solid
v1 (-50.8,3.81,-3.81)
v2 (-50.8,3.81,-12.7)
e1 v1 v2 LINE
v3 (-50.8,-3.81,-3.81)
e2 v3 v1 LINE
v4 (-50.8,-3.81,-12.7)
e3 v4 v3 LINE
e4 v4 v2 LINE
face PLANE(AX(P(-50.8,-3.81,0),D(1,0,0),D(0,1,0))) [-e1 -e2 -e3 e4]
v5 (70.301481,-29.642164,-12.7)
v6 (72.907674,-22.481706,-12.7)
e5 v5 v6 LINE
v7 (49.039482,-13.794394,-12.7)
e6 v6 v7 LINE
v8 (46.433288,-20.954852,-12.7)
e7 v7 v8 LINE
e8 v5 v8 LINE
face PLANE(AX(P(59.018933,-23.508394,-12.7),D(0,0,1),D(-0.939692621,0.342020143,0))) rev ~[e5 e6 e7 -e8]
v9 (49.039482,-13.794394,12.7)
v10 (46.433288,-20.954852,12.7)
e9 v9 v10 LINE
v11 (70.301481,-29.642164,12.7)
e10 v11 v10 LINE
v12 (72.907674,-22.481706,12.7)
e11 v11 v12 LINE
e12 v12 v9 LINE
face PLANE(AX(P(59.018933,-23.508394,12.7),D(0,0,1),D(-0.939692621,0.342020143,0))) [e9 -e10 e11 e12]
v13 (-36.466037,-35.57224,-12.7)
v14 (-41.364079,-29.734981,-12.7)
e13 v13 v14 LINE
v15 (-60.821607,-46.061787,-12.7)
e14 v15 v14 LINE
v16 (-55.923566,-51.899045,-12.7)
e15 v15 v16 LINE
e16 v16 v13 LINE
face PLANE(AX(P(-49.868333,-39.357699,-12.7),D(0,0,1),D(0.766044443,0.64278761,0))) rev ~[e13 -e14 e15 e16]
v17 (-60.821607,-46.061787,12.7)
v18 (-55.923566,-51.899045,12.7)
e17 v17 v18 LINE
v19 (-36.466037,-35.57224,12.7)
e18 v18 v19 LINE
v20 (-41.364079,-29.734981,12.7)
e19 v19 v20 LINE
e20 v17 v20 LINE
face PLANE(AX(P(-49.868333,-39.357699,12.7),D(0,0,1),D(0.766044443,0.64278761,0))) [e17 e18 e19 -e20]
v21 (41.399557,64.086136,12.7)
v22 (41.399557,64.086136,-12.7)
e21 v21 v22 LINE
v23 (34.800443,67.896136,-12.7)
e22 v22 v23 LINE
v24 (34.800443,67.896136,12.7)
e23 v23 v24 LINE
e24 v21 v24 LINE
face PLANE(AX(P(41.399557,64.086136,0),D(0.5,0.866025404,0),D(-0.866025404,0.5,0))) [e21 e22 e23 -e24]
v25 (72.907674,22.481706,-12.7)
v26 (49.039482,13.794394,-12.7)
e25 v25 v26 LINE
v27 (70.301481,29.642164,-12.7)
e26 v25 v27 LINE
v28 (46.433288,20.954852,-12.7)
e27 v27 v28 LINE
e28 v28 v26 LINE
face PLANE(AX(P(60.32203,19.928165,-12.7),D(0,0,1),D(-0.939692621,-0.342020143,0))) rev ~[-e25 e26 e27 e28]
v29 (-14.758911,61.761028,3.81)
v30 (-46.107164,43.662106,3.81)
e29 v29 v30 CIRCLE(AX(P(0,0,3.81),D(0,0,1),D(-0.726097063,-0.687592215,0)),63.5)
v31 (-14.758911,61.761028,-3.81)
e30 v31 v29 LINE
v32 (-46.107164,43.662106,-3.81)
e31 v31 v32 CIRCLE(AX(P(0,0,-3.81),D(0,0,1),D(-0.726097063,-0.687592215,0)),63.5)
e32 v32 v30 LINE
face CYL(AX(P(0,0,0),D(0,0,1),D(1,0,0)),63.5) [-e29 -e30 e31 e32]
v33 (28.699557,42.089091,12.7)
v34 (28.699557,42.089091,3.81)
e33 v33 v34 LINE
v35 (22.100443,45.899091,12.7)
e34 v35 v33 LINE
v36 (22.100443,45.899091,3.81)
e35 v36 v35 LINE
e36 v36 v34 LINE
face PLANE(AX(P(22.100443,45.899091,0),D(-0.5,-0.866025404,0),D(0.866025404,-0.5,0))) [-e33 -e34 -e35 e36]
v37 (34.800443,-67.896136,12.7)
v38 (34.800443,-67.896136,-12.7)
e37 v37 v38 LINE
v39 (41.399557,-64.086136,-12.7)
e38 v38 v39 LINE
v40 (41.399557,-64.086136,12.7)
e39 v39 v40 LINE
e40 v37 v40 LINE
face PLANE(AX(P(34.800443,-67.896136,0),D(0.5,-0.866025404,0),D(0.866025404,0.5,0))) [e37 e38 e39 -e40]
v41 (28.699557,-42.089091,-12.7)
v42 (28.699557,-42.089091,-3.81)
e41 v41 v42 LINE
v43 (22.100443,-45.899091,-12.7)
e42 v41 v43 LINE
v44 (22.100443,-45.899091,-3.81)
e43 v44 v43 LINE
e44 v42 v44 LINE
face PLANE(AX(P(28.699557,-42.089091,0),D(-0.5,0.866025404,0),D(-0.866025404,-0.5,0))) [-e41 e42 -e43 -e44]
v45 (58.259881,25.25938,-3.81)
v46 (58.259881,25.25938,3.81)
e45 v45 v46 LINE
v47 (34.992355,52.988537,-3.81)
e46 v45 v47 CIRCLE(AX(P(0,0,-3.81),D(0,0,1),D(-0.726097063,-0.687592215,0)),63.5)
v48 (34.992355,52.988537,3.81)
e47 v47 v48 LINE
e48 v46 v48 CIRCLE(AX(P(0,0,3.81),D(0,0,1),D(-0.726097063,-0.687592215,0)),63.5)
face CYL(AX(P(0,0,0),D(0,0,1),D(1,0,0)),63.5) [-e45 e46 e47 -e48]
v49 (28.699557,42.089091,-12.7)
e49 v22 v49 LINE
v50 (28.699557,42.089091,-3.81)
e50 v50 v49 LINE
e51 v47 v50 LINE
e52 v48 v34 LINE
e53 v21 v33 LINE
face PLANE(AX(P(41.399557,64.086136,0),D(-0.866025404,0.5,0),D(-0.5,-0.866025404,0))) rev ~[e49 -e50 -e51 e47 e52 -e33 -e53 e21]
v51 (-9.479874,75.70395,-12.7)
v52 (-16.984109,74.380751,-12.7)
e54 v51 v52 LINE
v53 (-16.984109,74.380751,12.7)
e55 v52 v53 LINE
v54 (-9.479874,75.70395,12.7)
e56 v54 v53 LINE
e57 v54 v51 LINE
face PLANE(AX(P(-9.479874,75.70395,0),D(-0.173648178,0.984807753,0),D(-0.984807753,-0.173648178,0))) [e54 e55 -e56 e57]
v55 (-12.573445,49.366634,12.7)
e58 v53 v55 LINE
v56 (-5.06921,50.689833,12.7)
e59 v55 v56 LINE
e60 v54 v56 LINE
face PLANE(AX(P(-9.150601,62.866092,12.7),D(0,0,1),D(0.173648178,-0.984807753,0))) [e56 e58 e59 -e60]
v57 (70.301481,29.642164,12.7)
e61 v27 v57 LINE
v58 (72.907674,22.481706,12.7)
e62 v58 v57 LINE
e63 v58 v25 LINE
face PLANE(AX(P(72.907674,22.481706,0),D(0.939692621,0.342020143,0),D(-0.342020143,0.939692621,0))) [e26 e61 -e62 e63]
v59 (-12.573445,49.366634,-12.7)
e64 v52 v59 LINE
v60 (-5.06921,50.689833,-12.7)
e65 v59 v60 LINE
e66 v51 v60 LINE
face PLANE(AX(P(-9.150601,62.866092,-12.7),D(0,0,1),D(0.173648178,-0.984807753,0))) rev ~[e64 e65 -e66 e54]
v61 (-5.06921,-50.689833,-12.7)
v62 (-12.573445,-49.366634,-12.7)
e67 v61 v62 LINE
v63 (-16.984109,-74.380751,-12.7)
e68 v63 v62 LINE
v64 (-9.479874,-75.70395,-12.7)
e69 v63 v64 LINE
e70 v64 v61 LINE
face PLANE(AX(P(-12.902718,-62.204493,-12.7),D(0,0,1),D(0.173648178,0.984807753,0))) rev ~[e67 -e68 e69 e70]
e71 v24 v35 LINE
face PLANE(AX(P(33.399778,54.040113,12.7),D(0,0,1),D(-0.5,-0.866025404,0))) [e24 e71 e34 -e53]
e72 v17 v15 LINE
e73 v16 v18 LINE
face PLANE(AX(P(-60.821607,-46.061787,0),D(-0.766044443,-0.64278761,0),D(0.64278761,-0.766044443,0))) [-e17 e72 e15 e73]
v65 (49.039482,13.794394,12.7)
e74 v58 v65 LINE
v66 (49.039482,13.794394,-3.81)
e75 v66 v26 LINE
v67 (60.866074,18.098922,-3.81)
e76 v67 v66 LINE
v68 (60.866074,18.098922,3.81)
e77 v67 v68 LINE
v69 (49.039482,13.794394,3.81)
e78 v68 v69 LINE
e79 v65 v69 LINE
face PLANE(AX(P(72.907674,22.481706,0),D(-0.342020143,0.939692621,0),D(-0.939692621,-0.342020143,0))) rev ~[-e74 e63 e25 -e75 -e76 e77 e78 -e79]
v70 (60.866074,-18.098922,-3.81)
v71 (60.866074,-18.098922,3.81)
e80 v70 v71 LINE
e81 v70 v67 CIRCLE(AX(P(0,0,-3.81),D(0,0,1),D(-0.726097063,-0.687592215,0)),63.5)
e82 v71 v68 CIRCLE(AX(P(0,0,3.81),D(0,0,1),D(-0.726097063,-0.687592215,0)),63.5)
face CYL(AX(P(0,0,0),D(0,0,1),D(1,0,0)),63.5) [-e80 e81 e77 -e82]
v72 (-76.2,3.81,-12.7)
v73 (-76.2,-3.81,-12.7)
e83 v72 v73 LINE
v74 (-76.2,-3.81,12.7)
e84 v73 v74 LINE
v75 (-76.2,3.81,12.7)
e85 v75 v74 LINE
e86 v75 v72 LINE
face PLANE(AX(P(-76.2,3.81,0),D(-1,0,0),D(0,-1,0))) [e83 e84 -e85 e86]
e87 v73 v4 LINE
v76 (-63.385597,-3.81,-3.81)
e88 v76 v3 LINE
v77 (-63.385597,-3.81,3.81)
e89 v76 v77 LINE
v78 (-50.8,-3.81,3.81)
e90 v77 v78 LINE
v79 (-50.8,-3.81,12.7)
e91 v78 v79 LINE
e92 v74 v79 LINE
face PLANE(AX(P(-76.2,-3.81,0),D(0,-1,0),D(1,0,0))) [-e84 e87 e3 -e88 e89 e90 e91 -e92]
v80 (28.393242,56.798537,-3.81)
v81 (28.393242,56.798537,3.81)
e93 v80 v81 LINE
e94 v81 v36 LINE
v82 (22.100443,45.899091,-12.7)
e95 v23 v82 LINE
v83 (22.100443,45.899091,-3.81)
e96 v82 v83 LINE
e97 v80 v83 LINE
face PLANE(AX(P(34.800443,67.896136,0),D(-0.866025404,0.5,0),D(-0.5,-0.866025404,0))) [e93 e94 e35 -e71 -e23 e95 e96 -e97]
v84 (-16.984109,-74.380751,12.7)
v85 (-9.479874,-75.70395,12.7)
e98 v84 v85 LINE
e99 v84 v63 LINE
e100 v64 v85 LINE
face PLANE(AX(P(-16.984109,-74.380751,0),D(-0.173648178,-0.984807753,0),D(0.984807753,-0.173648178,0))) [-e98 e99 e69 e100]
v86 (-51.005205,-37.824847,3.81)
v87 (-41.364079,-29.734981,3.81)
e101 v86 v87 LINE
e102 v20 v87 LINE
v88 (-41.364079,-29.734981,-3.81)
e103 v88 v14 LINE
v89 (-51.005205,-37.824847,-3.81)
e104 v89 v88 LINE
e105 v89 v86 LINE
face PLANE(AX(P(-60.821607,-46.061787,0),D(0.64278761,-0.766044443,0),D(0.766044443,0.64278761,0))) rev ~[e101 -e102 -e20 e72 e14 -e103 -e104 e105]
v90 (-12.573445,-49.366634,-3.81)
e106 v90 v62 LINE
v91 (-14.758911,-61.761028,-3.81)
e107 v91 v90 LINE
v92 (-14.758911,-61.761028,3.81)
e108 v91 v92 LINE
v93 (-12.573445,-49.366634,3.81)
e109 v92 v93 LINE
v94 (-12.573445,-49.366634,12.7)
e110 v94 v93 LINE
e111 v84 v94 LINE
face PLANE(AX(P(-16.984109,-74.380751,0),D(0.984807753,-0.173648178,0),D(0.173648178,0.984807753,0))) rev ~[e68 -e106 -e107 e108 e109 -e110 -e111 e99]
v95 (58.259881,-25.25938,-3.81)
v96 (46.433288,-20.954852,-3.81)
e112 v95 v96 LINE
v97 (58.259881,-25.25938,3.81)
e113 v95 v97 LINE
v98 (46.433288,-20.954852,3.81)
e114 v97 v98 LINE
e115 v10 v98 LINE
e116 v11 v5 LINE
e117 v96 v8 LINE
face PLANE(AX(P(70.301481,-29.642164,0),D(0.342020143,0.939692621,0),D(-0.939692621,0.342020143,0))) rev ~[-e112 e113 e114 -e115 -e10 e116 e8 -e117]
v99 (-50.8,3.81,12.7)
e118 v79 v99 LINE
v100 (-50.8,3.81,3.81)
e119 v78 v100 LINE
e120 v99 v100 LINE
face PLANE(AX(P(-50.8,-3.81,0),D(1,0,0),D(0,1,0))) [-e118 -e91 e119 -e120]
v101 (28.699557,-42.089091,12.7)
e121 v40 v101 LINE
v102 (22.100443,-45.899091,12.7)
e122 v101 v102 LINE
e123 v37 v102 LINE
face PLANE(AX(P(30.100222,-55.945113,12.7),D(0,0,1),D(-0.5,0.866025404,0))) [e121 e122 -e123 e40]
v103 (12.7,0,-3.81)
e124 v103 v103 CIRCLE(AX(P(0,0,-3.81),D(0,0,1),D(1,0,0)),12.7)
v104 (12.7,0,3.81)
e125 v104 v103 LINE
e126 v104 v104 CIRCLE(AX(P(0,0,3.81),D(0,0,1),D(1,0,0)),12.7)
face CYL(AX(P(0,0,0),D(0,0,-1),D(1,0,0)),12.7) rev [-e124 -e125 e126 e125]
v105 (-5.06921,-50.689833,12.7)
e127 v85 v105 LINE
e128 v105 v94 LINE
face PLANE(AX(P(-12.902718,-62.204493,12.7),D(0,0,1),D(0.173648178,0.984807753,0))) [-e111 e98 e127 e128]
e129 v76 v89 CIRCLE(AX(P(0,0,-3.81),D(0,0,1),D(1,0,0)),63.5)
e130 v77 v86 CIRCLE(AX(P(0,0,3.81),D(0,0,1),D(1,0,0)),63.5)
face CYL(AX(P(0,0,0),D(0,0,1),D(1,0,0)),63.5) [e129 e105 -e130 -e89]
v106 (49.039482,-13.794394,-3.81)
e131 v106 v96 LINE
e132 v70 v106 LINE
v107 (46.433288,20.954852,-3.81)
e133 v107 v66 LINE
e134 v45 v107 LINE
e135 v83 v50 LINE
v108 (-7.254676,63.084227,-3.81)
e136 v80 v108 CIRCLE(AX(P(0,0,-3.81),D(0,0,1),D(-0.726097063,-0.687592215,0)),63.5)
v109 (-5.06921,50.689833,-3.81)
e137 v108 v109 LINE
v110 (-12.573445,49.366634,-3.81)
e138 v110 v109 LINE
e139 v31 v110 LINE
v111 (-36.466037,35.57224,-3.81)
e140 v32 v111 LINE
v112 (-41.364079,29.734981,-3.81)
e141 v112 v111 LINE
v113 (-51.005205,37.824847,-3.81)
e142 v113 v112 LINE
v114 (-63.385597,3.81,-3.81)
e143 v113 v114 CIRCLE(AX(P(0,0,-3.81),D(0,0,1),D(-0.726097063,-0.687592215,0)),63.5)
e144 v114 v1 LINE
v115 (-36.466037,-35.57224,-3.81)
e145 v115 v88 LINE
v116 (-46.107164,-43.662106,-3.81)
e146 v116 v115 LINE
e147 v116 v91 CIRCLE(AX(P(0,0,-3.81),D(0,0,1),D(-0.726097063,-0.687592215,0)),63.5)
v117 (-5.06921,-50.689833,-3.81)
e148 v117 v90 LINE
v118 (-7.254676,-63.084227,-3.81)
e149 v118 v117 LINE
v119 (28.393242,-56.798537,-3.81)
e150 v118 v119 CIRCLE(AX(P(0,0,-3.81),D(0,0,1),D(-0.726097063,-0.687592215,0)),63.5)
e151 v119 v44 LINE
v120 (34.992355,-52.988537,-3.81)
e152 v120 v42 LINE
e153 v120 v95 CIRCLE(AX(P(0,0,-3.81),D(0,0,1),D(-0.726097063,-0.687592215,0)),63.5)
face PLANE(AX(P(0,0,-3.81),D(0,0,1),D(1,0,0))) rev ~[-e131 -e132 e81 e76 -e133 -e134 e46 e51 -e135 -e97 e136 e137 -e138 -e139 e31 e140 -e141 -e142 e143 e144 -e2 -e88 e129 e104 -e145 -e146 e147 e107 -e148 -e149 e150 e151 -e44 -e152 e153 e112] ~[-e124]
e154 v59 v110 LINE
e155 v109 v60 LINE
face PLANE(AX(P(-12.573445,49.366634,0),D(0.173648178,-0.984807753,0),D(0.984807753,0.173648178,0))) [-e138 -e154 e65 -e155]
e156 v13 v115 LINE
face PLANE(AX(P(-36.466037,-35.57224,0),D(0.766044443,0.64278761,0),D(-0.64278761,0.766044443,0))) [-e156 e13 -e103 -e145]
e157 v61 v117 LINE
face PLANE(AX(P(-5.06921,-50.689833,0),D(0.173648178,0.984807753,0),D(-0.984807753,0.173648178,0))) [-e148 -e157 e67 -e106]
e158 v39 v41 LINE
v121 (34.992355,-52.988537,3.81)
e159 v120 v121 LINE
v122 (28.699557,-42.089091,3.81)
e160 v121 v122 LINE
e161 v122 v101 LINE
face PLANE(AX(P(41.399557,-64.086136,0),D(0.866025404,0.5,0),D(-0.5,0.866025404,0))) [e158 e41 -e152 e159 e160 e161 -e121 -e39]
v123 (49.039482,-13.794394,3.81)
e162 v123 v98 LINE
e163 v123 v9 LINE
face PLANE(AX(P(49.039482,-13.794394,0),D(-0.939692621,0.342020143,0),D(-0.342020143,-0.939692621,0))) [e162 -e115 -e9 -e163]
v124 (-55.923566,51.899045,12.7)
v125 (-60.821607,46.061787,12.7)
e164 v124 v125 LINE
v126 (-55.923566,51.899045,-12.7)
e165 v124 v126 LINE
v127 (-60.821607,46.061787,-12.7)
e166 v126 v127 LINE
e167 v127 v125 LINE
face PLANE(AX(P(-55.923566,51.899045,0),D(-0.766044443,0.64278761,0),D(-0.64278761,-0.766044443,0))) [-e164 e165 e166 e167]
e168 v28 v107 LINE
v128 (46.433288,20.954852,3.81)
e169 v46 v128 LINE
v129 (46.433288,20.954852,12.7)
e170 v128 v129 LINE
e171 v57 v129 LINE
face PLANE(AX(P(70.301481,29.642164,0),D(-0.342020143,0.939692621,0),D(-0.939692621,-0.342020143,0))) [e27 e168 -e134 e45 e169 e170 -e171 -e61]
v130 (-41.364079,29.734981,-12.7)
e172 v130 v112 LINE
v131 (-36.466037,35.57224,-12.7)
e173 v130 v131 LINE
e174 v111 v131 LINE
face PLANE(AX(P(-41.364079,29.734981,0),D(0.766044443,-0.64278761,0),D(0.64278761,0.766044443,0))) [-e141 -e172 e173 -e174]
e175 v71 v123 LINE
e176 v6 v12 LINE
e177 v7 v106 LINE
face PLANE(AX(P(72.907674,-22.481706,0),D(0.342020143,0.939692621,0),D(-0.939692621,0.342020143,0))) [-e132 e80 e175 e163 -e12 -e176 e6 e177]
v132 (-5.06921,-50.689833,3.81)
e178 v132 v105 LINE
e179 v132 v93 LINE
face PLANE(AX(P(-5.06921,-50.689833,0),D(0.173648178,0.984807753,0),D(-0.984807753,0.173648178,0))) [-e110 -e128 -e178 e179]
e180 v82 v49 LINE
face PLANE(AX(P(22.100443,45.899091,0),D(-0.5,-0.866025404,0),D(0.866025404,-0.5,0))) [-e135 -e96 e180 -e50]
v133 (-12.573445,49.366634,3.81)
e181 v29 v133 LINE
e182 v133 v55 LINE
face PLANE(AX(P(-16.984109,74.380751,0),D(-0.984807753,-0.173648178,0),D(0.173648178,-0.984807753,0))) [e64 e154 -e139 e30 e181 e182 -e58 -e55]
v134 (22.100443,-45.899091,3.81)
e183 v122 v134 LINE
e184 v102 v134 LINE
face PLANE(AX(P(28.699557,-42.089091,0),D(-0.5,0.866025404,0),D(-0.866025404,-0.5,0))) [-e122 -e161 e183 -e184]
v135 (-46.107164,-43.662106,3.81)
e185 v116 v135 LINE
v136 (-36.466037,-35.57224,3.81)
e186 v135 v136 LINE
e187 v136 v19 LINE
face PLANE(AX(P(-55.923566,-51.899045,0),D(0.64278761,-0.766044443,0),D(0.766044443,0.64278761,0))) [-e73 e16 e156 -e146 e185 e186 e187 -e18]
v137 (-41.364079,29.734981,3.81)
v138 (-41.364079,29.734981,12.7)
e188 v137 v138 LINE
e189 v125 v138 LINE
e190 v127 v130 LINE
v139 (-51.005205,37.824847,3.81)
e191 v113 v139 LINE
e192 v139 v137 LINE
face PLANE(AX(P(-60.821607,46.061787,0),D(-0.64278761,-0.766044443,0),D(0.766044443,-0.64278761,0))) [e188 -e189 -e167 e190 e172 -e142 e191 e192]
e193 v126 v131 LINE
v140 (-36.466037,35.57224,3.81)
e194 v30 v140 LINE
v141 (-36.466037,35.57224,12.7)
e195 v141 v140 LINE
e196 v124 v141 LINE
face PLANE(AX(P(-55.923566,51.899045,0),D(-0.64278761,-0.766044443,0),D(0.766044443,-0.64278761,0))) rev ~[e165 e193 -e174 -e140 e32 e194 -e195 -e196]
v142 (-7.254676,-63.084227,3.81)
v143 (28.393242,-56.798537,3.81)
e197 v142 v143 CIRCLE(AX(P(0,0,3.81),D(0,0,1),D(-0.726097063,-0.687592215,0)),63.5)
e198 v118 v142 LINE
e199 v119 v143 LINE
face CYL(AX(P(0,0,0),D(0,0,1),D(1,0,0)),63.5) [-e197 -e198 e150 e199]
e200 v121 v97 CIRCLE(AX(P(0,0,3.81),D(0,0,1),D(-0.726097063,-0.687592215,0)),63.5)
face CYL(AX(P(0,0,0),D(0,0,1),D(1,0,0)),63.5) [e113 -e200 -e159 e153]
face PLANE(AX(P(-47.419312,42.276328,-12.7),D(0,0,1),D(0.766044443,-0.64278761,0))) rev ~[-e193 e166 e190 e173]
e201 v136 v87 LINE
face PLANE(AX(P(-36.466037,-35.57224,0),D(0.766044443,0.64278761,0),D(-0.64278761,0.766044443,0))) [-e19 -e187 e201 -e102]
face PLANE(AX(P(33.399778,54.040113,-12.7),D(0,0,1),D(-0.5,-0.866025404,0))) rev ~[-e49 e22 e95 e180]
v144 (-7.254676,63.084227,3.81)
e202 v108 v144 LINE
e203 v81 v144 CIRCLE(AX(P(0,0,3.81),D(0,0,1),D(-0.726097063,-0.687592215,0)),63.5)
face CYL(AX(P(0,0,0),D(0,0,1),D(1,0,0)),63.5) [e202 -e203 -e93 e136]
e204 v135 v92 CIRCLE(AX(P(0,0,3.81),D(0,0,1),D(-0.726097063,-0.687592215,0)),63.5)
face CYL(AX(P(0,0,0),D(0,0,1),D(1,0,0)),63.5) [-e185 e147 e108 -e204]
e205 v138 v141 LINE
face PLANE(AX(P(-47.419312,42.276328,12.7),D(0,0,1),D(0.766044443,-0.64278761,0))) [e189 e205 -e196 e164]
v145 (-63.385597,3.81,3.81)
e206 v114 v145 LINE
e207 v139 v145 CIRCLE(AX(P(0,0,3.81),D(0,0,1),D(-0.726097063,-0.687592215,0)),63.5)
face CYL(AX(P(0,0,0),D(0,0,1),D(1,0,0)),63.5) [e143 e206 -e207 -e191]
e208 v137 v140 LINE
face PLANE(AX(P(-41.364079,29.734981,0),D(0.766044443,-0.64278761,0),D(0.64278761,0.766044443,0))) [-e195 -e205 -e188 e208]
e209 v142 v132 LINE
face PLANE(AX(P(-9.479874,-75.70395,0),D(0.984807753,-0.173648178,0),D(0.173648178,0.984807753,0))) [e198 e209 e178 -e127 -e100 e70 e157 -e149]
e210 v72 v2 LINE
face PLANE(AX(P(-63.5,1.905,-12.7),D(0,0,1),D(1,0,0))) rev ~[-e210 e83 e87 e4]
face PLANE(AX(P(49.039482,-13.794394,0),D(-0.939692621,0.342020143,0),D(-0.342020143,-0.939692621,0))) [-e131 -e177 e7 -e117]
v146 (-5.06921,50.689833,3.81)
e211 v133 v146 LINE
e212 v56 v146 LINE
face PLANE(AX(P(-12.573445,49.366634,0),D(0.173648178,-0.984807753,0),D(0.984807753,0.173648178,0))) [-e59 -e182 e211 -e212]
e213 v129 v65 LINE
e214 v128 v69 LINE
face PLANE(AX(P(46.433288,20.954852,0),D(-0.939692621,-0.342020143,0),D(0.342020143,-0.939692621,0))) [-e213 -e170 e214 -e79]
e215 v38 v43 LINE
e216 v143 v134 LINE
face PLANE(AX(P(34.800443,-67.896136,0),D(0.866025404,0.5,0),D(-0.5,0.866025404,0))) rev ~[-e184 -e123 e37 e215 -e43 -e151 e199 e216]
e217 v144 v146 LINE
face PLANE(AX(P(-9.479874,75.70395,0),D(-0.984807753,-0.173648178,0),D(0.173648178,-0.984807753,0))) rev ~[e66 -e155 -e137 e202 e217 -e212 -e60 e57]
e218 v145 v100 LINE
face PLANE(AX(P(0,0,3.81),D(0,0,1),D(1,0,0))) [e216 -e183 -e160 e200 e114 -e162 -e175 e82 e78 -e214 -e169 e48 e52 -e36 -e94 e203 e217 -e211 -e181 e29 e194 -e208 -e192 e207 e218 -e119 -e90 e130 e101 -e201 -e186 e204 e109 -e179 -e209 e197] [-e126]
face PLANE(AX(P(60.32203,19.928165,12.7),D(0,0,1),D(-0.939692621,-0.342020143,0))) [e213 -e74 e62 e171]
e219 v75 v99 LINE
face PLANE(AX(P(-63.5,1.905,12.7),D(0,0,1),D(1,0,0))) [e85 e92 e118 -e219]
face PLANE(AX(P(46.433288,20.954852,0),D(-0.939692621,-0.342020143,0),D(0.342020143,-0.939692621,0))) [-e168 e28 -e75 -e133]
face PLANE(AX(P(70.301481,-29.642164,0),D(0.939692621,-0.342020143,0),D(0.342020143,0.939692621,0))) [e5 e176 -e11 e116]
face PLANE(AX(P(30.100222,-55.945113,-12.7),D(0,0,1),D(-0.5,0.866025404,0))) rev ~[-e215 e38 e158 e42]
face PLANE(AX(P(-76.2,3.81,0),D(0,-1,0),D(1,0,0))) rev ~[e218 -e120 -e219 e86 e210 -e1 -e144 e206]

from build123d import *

# Parameters (mm, degrees)
F0_R            = 63.5
F0_R_2          = 12.7
F2_DEPTH        = 3.81
F1_W            = 25.4
F1_H            = 3.81
F3_DEPTH        = 12.7
F3_COPIES_COUNT = 9


# Not quite as in the source:
# - a pattern or mirror of a feature is missing from the dataset's text; its kind, count and spacing are read off the source's solid


with BuildPart() as f2:
    # F0 (on Top) → F2 (new body, symmetric)
    with BuildSketch(Plane.XY):
        Circle(F0_R)
        Circle(F0_R_2, mode=Mode.SUBTRACT)
    extrude(amount=F2_DEPTH, both=True)

    # F1 (on Top) → F3 (join, symmetric)
    with BuildSketch(Plane.XY):
        with Locations((-63.5, 1.905)):
            Rectangle(F1_W, F1_H)
        with Locations((-63.5, -1.905)):
            Rectangle(F1_W, F1_H)
    f3 = extrude(amount=F3_DEPTH, both=True)

    # F3_copies: F3 ×9 about axis
    f3_copies_axis = Axis((0, 0, 0), (0, 0, 1))
    for i in range(1, F3_COPIES_COUNT):
        add(f3.rotate(f3_copies_axis, i * 360 / F3_COPIES_COUNT))


solid = f2.part
